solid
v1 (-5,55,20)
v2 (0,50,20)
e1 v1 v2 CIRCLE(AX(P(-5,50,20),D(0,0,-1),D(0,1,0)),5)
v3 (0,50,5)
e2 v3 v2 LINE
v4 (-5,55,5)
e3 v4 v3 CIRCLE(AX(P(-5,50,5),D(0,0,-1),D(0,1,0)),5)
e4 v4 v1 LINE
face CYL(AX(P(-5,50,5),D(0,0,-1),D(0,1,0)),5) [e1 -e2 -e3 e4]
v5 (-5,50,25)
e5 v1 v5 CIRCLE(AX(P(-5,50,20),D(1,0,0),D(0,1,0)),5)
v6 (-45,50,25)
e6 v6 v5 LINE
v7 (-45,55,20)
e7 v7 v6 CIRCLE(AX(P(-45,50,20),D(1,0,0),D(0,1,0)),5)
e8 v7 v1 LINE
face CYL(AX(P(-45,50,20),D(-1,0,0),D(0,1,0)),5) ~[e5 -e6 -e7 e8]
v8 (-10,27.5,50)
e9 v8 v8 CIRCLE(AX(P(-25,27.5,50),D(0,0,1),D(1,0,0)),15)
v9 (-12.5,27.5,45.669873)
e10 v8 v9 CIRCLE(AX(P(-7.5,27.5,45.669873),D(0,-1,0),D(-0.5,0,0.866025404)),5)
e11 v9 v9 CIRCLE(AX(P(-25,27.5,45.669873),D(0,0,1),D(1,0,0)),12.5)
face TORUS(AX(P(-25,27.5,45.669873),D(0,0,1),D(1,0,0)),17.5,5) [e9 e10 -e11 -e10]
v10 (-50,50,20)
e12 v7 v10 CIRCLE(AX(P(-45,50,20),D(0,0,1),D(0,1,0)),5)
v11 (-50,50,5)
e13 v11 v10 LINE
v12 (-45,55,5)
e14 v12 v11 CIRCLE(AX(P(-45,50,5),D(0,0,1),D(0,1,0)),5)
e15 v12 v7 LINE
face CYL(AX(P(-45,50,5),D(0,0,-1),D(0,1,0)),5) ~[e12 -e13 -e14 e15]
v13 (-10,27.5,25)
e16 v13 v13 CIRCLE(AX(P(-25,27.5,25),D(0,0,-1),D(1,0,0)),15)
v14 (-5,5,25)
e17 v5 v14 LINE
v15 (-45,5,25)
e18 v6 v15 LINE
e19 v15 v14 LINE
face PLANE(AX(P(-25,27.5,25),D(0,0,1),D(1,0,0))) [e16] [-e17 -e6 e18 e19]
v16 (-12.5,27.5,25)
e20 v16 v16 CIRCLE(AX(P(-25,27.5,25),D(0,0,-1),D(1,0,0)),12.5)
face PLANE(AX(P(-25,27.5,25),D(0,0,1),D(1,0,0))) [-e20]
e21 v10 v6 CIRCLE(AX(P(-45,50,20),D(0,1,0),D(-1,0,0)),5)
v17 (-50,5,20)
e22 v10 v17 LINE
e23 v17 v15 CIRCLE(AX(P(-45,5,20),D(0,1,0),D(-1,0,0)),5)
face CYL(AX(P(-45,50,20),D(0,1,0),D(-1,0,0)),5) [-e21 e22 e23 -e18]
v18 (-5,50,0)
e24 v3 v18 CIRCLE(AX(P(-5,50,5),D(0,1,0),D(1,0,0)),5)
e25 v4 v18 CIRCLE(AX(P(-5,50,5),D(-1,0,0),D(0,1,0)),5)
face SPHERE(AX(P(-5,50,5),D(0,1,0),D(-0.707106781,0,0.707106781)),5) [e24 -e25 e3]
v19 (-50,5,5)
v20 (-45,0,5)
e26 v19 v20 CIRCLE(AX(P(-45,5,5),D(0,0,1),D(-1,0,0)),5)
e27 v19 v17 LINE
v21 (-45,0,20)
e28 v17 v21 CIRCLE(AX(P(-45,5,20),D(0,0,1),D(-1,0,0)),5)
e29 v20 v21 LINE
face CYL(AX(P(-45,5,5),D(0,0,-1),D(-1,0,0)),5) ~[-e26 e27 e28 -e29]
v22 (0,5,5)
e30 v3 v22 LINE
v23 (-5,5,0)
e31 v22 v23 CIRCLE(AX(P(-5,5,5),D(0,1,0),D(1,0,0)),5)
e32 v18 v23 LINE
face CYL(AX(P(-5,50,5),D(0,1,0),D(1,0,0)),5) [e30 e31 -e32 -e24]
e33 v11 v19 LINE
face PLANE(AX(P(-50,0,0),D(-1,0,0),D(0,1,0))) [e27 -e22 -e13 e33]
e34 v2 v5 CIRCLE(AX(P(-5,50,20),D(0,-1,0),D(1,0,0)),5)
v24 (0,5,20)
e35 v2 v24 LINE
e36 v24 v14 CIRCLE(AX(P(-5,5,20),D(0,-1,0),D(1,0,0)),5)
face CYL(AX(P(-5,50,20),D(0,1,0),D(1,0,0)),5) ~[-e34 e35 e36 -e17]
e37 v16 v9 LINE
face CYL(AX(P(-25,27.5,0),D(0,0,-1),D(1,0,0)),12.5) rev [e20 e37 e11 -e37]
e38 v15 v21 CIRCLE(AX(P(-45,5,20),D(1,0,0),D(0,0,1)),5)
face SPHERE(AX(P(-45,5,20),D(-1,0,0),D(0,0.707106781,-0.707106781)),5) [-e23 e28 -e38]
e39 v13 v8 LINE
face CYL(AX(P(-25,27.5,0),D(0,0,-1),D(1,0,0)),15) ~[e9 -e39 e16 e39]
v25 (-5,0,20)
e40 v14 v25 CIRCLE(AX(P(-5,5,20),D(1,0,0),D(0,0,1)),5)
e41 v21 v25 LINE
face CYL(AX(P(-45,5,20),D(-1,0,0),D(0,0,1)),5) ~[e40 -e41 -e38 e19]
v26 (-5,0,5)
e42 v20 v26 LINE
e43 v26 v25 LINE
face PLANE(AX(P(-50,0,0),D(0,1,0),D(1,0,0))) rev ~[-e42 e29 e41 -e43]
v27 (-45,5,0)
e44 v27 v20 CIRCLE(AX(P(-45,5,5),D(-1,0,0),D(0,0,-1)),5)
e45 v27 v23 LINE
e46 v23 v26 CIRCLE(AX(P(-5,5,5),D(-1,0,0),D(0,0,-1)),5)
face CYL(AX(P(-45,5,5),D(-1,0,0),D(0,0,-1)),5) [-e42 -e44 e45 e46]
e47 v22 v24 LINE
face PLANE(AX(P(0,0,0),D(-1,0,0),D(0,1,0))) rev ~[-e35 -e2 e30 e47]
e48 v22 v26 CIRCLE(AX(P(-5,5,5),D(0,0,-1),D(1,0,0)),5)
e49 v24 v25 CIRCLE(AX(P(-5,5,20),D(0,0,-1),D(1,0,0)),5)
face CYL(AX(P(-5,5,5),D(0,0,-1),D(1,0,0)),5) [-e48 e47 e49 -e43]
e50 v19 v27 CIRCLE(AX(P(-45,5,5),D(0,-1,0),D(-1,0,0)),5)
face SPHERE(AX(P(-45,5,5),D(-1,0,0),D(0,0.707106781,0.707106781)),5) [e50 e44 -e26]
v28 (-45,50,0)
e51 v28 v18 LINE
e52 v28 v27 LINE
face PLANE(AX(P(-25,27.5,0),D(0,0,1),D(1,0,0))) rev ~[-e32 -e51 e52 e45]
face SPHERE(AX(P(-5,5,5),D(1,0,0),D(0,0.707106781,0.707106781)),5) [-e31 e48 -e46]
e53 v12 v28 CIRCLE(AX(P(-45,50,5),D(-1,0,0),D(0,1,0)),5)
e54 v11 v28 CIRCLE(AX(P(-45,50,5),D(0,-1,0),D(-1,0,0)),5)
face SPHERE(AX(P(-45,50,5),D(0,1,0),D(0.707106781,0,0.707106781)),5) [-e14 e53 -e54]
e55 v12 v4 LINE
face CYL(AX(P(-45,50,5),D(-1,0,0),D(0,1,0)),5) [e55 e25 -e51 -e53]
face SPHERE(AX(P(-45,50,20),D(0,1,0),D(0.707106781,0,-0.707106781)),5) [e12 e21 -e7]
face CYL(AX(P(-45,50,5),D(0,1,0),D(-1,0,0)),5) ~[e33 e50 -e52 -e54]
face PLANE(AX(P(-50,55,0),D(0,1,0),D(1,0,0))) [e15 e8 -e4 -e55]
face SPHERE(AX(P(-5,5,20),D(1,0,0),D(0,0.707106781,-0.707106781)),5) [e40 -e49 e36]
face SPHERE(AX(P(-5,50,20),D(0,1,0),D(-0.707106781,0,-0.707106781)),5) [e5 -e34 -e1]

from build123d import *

# Parameters (mm, degrees)
F0_W         = 50
F0_H         = 55
F0_R         = 15
F0_R_2       = 12.5
F1_DEPTH     = 25
F2_DEPTH     = 50
F3_T1_DEPTH  = 40
F3_T3_DEPTH  = 45
F3_T5_DEPTH  = 15
F3_S9_W      = 5.1
F3_S9_H      = 5.1
F3_T10_DEPTH = 5.1
F3_S15_W     = 5.1
F3_S15_H     = 5.1
F3_T16_DEPTH = 5.1
F3_S21_W     = 5.1
F3_S21_H     = 5.1
F3_T22_DEPTH = 5.1
F3_S27_W     = 5.1
F3_S27_H     = 5.1
F3_T28_DEPTH = 5.1
F3_S33_W     = 5.1
F3_S33_H     = 5.1
F3_T34_DEPTH = 5.1
F3_S39_W     = 5.1
F3_S39_H     = 5.1
F3_T40_DEPTH = 5.1
F3_S45_W     = 5.1
F3_S45_H     = 5.1
F3_T46_DEPTH = 5.1
F3_S51_W     = 5.1
F3_S51_H     = 5.1
F3_T52_DEPTH = 5.1


# Not quite as in the source:
# - a fillet or chamfer that OpenCascade refuses, or shapes differently, is made with other operations: its cross-section is extruded or revolved along the edge and cut away or added


with BuildPart() as f1:
    # F0 (on Top) → F1 (new body)
    with BuildSketch(Plane.XY):
        with Locations((-25, 27.5)):
            Rectangle(F0_W, F0_H)
        with Locations((-25, 27.5)):
            Circle(F0_R, mode=Mode.SUBTRACT)
        with Locations((-25, 27.5)):
            Circle(F0_R)
        with Locations((-25, 27.5)):
            Circle(F0_R_2, mode=Mode.SUBTRACT)
        with Locations((-25, 27.5)):
            Circle(F0_R_2)
    extrude(amount=F1_DEPTH)

    # F0 (on Top) → F2 (join)
    with BuildSketch(Plane.XY):
        with Locations((-25, 27.5)):
            Circle(F0_R)
        with Locations((-25, 27.5)):
            Circle(F0_R_2, mode=Mode.SUBTRACT)
    extrude(amount=F2_DEPTH)

    # F3: fillet of radius 5 on 13 edges, made by hand

    # F3_s2 → F3_t1 (cut)
    with BuildSketch(Plane.YZ.offset(-45)):
        with BuildLine():
            ThreePointArc((55, 20), (53.5355339059, 23.5355339059), (50, 25))
            Line((50, 25), (55, 25))
            Line((55, 25), (55, 20))
        make_face()
        with BuildLine():
            ThreePointArc((5, 0), (1.4644660941, 1.4644660941), (0, 5))
            Line((0, 5), (0, 0))
            Line((0, 0), (5, 0))
        make_face()
        with BuildLine():
            ThreePointArc((5, 25), (1.4644660941, 23.5355339059), (0, 20))
            Line((0, 20), (0, 25))
            Line((0, 25), (5, 25))
        make_face()
        with BuildLine():
            ThreePointArc((55, 5), (53.5355339059, 1.4644660941), (50, 0))
            Line((50, 0), (55, 0))
            Line((55, 0), (55, 5))
        make_face()
    extrude(amount=F3_T1_DEPTH, mode=Mode.SUBTRACT)

    # F3_s4 → F3_t3 (cut)
    with BuildSketch(Plane.XZ.offset(-50)):
        with BuildLine():
            ThreePointArc((-50, 20), (-48.5355339059, 23.5355339059), (-45, 25))
            Line((-45, 25), (-50, 25))
            Line((-50, 25), (-50, 20))
        make_face()
        with BuildLine():
            ThreePointArc((0, 5), (-1.4644660941, 1.4644660941), (-5, 0))
            Line((-5, 0), (0, 0))
            Line((0, 0), (0, 5))
        make_face()
        with BuildLine():
            ThreePointArc((0, 20), (-1.4644660941, 23.5355339059), (-5, 25))
            Line((-5, 25), (0, 25))
            Line((0, 25), (0, 20))
        make_face()
        with BuildLine():
            ThreePointArc((-50, 5), (-48.5355339059, 1.4644660941), (-45, 0))
            Line((-45, 0), (-50, 0))
            Line((-50, 0), (-50, 5))
        make_face()
    extrude(amount=F3_T3_DEPTH, mode=Mode.SUBTRACT)

    # F3_s6 → F3_t5 (cut)
    with BuildSketch(Plane.XY.offset(5)):
        with BuildLine():
            ThreePointArc((-50, 5), (-48.5355339059, 1.4644660941), (-45, 0))
            Line((-45, 0), (-50, 0))
            Line((-50, 0), (-50, 5))
        make_face()
        with BuildLine():
            ThreePointArc((0, 5), (-1.4644660941, 1.4644660941), (-5, 0))
            Line((-5, 0), (0, 0))
            Line((0, 0), (0, 5))
        make_face()
        with BuildLine():
            ThreePointArc((-5, 55), (-1.4644660941, 53.5355339059), (0, 50))
            Line((0, 50), (0, 55))
            Line((0, 55), (-5, 55))
        make_face()
        with BuildLine():
            ThreePointArc((-45, 55), (-48.5355339059, 53.5355339059), (-50, 50))
            Line((-50, 50), (-50, 55))
            Line((-50, 55), (-45, 55))
        make_face()
    extrude(amount=F3_T5_DEPTH, mode=Mode.SUBTRACT)


with BuildPart() as f3_tool8:
    # F3_s9 → F3_t10 (new body)
    with BuildSketch(Plane.XZ.offset(-50)):
        with Locations((-2.45, 22.55)):
            Rectangle(F3_S9_W, F3_S9_H)
    extrude(amount=-F3_T10_DEPTH)

    # F3_s11 → F3_t12 (revolve, cut)
    with BuildSketch(Plane(origin=(-5, 50, 20), x_dir=(-0.7071067812, 0, -0.7071067812), z_dir=(0.7071067812, 0, -0.7071067812))):
        with BuildLine():
            ThreePointArc((0, -5), (5, 0), (0, 5))
            Line((0, 5), (0, -5))
        make_face()
    revolve(axis=Axis((-5, 50, 20), (0, 1, 0)), mode=Mode.SUBTRACT)


with BuildPart() as f1_1:
    add(f1.part)

    # F3_t7: cut F3_tool8
    add(f3_tool8.part, mode=Mode.SUBTRACT)


with BuildPart() as f3_tool14:
    # F3_s15 → F3_t16 (new body)
    with BuildSketch(Plane.XZ.offset(-50)):
        with Locations((-47.55, 22.55)):
            Rectangle(F3_S15_W, F3_S15_H)
    extrude(amount=-F3_T16_DEPTH)

    # F3_s17 → F3_t18 (revolve, cut)
    with BuildSketch(Plane(origin=(-45, 50, 20), x_dir=(0.7071067812, 0, -0.7071067812), z_dir=(0.7071067812, 0, 0.7071067812))):
        with BuildLine():
            ThreePointArc((0, -5), (5, 0), (0, 5))
            Line((0, 5), (0, -5))
        make_face()
    revolve(axis=Axis((-45, 50, 20), (0, 1, 0)), mode=Mode.SUBTRACT)


with BuildPart() as f1_2:
    add(f1_1.part)

    # F3_t13: cut F3_tool14
    add(f3_tool14.part, mode=Mode.SUBTRACT)


with BuildPart() as f3_tool20:
    # F3_s21 → F3_t22 (new body)
    with BuildSketch(Plane.YZ.offset(-45)):
        with Locations((2.45, 22.55)):
            Rectangle(F3_S21_W, F3_S21_H)
    extrude(amount=-F3_T22_DEPTH)

    # F3_s23 → F3_t24 (revolve, cut)
    with BuildSketch(Plane(origin=(-45, 5, 20), x_dir=(0, 0.7071067812, -0.7071067812), z_dir=(0, 0.7071067812, 0.7071067812))):
        with BuildLine():
            ThreePointArc((0, -5), (5, 0), (0, 5))
            Line((0, 5), (0, -5))
        make_face()
    revolve(axis=Axis((-45, 5, 20), (-1, 0, 0)), mode=Mode.SUBTRACT)


with BuildPart() as f1_3:
    add(f1_2.part)

    # F3_t19: cut F3_tool20
    add(f3_tool20.part, mode=Mode.SUBTRACT)


with BuildPart() as f3_tool26:
    # F3_s27 → F3_t28 (new body)
    with BuildSketch(Plane.YZ.offset(-45)):
        with Locations((2.45, 2.45)):
            Rectangle(F3_S27_W, F3_S27_H)
    extrude(amount=-F3_T28_DEPTH)

    # F3_s29 → F3_t30 (revolve, cut)
    with BuildSketch(Plane(origin=(-45, 5, 5), x_dir=(0, 0.7071067812, 0.7071067812), z_dir=(0, -0.7071067812, 0.7071067812))):
        with BuildLine():
            ThreePointArc((0, -5), (5, 0), (0, 5))
            Line((0, 5), (0, -5))
        make_face()
    revolve(axis=Axis((-45, 5, 5), (-1, 0, 0)), mode=Mode.SUBTRACT)


with BuildPart() as f1_4:
    add(f1_3.part)

    # F3_t25: cut F3_tool26
    add(f3_tool26.part, mode=Mode.SUBTRACT)


with BuildPart() as f3_tool32:
    # F3_s33 → F3_t34 (new body)
    with BuildSketch(Plane.YZ.offset(-5)):
        with Locations((2.45, 2.45)):
            Rectangle(F3_S33_W, F3_S33_H)
    extrude(amount=F3_T34_DEPTH)

    # F3_s35 → F3_t36 (revolve, cut)
    with BuildSketch(Plane(origin=(-5, 5, 5), x_dir=(0, 0.7071067812, 0.7071067812), z_dir=(0, 0.7071067812, -0.7071067812))):
        with BuildLine():
            ThreePointArc((0, -5), (5, 0), (0, 5))
            Line((0, 5), (0, -5))
        make_face()
    revolve(axis=Axis((-5, 5, 5), (1, 0, 0)), mode=Mode.SUBTRACT)


with BuildPart() as f1_5:
    add(f1_4.part)

    # F3_t31: cut F3_tool32
    add(f3_tool32.part, mode=Mode.SUBTRACT)


with BuildPart() as f3_tool38:
    # F3_s39 → F3_t40 (new body)
    with BuildSketch(Plane.YZ.offset(-5)):
        with Locations((2.45, 22.55)):
            Rectangle(F3_S39_W, F3_S39_H)
    extrude(amount=F3_T40_DEPTH)

    # F3_s41 → F3_t42 (revolve, cut)
    with BuildSketch(Plane(origin=(-5, 5, 20), x_dir=(0, 0.7071067812, -0.7071067812), z_dir=(0, -0.7071067812, -0.7071067812))):
        with BuildLine():
            ThreePointArc((0, -5), (5, 0), (0, 5))
            Line((0, 5), (0, -5))
        make_face()
    revolve(axis=Axis((-5, 5, 20), (1, 0, 0)), mode=Mode.SUBTRACT)


with BuildPart() as f1_6:
    add(f1_5.part)

    # F3_t37: cut F3_tool38
    add(f3_tool38.part, mode=Mode.SUBTRACT)


with BuildPart() as f3_tool44:
    # F3_s45 → F3_t46 (new body)
    with BuildSketch(Plane.XZ.offset(-50)):
        with Locations((-2.45, 2.45)):
            Rectangle(F3_S45_W, F3_S45_H)
    extrude(amount=-F3_T46_DEPTH)

    # F3_s47 → F3_t48 (revolve, cut)
    with BuildSketch(Plane(origin=(-5, 50, 5), x_dir=(-0.7071067812, 0, 0.7071067812), z_dir=(-0.7071067812, 0, -0.7071067812))):
        with BuildLine():
            ThreePointArc((0, -5), (5, 0), (0, 5))
            Line((0, 5), (0, -5))
        make_face()
    revolve(axis=Axis((-5, 50, 5), (0, 1, 0)), mode=Mode.SUBTRACT)


with BuildPart() as f1_7:
    add(f1_6.part)

    # F3_t43: cut F3_tool44
    add(f3_tool44.part, mode=Mode.SUBTRACT)


with BuildPart() as f3_tool50:
    # F3_s51 → F3_t52 (new body)
    with BuildSketch(Plane.XZ.offset(-50)):
        with Locations((-47.55, 2.45)):
            Rectangle(F3_S51_W, F3_S51_H)
    extrude(amount=-F3_T52_DEPTH)

    # F3_s53 → F3_t54 (revolve, cut)
    with BuildSketch(Plane(origin=(-45, 50, 5), x_dir=(0.7071067812, 0, 0.7071067812), z_dir=(-0.7071067812, 0, 0.7071067812))):
        with BuildLine():
            ThreePointArc((0, -5), (5, 0), (0, 5))
            Line((0, 5), (0, -5))
        make_face()
    revolve(axis=Axis((-45, 50, 5), (0, 1, 0)), mode=Mode.SUBTRACT)


with BuildPart() as f1_8:
    add(f1_7.part)

    # F3_t49: cut F3_tool50
    add(f3_tool50.part, mode=Mode.SUBTRACT)

    # F3_s55 → F3_t56 (revolve, cut)
    with BuildSketch(Plane.XZ.offset(-27.5)):
        with BuildLine():
            ThreePointArc((-10, 50), (-11.8301270189, 48.1698729811), (-12.5, 45.6698729811))
            Line((-12.5, 45.6698729811), (-12.5, 50))
            Line((-12.5, 50), (-10, 50))
        make_face()
    revolve(axis=Axis((-25, 27.5, 50), (0, 0, 1)), mode=Mode.SUBTRACT)


solid = f1_8.part
